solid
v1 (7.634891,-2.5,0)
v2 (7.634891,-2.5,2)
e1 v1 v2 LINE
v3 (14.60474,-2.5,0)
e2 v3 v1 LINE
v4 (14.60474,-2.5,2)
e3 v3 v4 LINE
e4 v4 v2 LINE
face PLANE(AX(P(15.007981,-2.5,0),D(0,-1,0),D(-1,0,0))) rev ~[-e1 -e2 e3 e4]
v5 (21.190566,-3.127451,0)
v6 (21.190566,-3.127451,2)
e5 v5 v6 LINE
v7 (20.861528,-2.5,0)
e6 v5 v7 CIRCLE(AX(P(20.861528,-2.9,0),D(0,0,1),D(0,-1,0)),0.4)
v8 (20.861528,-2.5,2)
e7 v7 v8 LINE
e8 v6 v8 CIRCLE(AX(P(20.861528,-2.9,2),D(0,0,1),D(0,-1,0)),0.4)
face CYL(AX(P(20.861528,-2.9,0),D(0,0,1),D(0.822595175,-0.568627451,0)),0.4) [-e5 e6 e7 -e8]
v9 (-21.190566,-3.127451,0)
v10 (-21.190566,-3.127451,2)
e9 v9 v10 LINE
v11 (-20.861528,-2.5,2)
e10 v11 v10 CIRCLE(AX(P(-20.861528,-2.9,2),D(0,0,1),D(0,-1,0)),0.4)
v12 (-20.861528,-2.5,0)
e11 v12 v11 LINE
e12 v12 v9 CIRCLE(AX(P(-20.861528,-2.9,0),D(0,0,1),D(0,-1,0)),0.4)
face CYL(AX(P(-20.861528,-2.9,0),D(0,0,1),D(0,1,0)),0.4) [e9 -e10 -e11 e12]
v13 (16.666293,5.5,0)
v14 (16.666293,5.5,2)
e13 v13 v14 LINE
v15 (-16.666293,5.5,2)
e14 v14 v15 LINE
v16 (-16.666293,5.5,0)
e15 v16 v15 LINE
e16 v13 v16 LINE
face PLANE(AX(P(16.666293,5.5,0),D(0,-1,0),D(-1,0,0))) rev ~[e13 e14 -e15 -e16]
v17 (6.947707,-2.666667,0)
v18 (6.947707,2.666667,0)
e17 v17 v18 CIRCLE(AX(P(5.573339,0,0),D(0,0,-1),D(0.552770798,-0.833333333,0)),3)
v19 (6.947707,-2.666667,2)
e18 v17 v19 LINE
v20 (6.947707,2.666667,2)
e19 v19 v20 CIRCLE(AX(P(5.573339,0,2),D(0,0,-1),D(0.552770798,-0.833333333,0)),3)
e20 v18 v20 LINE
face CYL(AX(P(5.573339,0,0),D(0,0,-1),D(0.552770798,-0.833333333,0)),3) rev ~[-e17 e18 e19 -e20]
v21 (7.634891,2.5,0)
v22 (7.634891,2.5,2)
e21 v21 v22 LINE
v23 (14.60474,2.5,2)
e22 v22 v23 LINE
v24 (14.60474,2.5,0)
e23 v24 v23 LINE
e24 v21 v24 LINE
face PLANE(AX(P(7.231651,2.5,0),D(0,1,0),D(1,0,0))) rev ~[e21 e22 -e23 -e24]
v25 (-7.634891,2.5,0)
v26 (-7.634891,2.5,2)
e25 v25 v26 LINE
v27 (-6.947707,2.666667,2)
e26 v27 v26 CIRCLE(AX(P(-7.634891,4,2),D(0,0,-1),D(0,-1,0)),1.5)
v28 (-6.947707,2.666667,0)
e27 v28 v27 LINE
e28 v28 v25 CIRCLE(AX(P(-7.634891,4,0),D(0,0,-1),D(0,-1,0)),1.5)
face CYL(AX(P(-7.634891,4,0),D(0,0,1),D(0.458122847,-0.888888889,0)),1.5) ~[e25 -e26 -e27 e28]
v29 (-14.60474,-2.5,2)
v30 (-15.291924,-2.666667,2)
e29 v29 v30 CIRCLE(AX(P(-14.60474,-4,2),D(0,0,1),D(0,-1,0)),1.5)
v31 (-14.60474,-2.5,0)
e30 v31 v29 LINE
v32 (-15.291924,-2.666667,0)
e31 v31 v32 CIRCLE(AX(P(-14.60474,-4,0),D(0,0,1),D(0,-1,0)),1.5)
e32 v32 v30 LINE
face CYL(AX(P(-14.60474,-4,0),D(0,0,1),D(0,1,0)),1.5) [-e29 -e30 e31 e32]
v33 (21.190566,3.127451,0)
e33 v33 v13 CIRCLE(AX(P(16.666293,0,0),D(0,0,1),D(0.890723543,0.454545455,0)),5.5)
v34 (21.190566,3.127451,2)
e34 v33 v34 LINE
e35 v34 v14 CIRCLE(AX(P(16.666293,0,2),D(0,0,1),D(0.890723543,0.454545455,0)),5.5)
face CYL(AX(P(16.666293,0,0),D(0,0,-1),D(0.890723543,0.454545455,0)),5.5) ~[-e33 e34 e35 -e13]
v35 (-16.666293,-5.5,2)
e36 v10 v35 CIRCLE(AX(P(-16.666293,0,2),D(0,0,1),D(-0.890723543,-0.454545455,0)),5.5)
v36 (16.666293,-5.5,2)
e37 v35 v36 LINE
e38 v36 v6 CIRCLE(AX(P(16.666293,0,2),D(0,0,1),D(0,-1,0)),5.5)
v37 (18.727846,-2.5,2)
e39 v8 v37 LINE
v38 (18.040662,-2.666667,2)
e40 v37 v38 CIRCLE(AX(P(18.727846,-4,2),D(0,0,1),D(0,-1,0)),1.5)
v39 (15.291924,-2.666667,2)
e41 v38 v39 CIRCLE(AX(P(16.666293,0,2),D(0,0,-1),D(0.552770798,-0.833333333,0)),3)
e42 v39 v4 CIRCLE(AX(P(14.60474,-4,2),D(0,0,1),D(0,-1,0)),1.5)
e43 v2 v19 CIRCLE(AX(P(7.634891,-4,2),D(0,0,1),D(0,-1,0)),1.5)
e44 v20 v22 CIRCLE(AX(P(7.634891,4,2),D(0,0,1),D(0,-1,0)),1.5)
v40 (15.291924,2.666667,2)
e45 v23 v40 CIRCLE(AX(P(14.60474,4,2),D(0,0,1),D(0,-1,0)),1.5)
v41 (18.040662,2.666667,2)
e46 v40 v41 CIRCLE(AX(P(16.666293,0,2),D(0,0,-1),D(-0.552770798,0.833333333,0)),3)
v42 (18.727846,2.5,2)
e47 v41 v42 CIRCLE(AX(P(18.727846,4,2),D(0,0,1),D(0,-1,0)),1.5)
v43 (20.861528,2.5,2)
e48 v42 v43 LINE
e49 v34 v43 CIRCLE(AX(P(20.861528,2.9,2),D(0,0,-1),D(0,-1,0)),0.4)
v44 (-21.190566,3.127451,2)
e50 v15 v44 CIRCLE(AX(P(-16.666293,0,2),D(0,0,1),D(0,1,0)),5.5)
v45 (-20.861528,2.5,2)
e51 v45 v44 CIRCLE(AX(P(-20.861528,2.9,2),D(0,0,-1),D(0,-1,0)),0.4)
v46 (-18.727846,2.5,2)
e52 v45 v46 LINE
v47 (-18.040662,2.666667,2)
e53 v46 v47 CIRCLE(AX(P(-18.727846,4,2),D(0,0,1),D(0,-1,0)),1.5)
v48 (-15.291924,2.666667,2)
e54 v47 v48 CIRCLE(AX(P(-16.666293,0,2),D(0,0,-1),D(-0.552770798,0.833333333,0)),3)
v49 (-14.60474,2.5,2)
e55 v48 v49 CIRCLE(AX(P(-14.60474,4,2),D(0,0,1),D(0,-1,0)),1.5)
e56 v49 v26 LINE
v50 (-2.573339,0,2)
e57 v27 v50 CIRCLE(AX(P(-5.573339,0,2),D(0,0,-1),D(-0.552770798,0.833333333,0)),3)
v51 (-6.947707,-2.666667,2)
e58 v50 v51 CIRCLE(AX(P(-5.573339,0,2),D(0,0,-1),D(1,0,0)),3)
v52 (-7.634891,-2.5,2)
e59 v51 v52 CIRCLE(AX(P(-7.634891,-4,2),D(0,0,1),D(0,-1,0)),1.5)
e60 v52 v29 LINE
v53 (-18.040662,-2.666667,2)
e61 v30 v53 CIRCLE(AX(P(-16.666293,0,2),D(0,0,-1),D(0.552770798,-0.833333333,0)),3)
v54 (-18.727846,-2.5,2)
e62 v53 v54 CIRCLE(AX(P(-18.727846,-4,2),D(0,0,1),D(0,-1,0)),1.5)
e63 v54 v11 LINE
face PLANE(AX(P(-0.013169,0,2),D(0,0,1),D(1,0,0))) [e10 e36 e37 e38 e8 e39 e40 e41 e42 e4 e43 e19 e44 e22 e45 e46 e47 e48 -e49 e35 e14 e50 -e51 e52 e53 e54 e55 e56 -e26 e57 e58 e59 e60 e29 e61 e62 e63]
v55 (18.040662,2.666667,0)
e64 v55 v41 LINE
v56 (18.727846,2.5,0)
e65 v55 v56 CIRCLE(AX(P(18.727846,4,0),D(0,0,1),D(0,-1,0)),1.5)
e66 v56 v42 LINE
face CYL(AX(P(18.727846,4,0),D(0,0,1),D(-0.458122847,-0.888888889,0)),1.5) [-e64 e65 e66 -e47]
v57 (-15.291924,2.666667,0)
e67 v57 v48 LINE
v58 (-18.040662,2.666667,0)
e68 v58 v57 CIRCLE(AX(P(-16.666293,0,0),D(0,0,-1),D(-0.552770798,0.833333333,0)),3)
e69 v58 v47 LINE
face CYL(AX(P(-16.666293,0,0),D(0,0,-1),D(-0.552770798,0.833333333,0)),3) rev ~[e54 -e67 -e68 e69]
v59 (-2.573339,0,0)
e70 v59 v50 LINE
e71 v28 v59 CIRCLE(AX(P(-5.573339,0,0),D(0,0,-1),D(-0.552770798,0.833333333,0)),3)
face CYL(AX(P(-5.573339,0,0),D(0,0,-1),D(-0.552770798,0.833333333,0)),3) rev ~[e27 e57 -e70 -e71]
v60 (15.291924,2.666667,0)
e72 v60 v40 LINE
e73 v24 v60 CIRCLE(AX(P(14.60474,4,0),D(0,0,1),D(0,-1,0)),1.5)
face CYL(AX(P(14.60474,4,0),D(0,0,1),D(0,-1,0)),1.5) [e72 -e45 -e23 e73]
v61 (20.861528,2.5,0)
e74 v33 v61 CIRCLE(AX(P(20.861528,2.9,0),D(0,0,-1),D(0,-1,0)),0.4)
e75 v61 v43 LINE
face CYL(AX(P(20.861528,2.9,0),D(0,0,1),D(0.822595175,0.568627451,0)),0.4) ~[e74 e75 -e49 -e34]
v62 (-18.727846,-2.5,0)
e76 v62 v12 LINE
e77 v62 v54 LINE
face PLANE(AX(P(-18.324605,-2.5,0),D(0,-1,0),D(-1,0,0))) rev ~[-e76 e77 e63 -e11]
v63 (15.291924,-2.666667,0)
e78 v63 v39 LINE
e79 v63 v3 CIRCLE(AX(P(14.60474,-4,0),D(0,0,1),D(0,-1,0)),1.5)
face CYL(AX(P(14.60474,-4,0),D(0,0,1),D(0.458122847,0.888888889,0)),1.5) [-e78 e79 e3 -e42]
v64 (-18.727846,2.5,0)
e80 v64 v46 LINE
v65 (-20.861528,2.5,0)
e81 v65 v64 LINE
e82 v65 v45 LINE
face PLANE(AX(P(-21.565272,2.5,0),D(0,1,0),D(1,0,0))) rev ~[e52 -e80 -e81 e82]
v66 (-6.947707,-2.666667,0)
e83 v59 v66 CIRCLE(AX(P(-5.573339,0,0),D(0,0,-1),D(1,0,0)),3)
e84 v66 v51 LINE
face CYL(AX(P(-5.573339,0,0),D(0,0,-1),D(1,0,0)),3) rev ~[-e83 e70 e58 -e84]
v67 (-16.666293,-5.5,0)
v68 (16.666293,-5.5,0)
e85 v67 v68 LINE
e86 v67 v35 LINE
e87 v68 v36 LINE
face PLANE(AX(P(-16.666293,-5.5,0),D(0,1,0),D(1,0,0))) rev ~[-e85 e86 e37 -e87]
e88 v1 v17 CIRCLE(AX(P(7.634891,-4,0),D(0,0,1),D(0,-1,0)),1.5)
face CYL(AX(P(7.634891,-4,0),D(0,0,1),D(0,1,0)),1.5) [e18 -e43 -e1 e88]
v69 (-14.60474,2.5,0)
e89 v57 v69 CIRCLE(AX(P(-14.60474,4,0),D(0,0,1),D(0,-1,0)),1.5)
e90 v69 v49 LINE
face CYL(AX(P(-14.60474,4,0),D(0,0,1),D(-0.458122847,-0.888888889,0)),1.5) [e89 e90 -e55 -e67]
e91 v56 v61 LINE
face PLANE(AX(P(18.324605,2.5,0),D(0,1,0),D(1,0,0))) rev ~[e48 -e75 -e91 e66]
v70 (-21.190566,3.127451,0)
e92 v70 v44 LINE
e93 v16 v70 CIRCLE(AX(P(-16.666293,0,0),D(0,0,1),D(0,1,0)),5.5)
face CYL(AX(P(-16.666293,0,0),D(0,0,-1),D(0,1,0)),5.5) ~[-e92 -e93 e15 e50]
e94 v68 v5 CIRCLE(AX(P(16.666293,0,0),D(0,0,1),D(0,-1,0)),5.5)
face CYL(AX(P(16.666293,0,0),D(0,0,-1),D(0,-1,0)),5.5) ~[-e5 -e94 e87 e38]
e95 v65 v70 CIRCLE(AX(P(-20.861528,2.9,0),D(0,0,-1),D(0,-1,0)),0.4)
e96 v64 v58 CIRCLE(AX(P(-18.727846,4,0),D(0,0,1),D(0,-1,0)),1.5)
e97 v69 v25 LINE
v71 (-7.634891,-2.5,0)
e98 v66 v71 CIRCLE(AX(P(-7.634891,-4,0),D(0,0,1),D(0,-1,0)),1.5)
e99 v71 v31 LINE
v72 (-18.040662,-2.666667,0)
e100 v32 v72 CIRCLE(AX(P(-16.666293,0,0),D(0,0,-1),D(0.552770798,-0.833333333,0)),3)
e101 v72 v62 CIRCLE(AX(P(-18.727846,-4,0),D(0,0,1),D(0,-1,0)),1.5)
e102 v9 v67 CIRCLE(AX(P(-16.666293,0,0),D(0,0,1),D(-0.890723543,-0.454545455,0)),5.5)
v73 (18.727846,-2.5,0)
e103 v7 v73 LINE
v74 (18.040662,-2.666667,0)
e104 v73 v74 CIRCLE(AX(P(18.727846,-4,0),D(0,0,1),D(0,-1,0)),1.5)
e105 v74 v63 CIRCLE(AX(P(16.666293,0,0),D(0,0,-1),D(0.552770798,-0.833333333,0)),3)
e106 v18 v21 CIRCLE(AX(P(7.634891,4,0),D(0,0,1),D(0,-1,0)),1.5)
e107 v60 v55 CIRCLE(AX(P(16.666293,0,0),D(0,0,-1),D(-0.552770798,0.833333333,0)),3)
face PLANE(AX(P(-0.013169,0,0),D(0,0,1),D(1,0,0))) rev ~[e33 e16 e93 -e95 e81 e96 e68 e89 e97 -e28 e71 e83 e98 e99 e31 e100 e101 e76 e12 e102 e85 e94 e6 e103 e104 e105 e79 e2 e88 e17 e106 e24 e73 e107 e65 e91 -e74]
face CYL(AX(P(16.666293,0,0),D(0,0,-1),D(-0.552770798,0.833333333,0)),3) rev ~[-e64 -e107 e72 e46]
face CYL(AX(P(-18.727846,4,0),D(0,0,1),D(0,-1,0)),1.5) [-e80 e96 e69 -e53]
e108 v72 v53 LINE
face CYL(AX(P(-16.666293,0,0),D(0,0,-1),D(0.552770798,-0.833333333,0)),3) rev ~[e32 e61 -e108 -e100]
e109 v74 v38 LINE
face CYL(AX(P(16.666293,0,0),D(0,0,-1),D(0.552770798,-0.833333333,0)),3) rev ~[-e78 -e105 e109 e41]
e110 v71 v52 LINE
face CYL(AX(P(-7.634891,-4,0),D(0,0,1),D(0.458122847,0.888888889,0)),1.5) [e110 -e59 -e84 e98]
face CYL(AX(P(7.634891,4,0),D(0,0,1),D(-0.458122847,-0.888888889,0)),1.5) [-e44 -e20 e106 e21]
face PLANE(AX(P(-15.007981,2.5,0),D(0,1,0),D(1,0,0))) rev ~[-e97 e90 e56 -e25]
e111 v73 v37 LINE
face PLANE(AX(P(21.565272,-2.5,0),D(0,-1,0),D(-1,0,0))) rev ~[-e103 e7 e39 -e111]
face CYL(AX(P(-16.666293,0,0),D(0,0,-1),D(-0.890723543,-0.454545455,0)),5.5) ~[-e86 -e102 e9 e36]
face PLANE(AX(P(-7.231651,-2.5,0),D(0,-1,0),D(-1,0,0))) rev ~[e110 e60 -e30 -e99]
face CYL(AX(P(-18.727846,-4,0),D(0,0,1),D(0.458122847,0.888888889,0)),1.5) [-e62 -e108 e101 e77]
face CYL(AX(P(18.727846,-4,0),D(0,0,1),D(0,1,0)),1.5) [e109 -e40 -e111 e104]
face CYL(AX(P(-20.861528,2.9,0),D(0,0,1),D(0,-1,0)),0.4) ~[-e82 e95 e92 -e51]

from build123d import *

# Parameters (mm, degrees)
F1_DEPTH = 2
F2_R     = 1.5
F3_R     = 0.4


with BuildPart() as f1:
    # F0 (on Top) → F1 (new body)
    with BuildSketch(Plane.XY):
        with BuildLine():
            ThreePointArc((-7.2316509448, 2.5), (-4.1547013841, 2.6433820369), (-2.5733385496, 0))
            ThreePointArc((-2.5733385496, 0), (-4.1547013841, -2.6433820369), (-7.2316509448, -2.5))
            Line((-7.2316509448, -2.5), (-11.7673134743, -2.5))
            ThreePointArc((-11.7673134743, -2.5), (-13.7940116366, -4.6904157598), (-16.6662929599, -5.5))
            Line((-16.6662929599, -5.5), (16.6662929599, -5.5))
            ThreePointArc((16.6662929599, -5.5), (13.7940116366, -4.6904157598), (11.7673134743, -2.5))
            Line((11.7673134743, -2.5), (7.2316509448, -2.5))
            ThreePointArc((7.2316509448, -2.5), (2.5733385496, 0), (7.2316509448, 2.5))
            Line((7.2316509448, 2.5), (11.7673134743, 2.5))
            ThreePointArc((11.7673134743, 2.5), (13.7940116366, 4.6904157598), (16.6662929599, 5.5))
            Line((16.6662929599, 5.5), (-16.6662929599, 5.5))
            ThreePointArc((-16.6662929599, 5.5), (-13.7940116366, 4.6904157598), (-11.7673134743, 2.5))
            Line((-11.7673134743, 2.5), (-7.2316509448, 2.5))
        make_face()
        with BuildLine():
            Line((-15.0079805647, 2.5), (-11.7673134743, 2.5))
            ThreePointArc((-11.7673134743, 2.5), (-13.7940116366, 4.6904157598), (-16.6662929599, 5.5))
            ThreePointArc((-16.6662929599, 5.5), (-19.5385742831, 4.6904157598), (-21.5652724454, 2.5))
            Line((-21.5652724454, 2.5), (-18.324605355, 2.5))
            ThreePointArc((-18.324605355, 2.5), (-16.6662929599, 3), (-15.0079805647, 2.5))
        make_face()
        with BuildLine():
            ThreePointArc((-16.6662929599, -5.5), (-13.7940116366, -4.6904157598), (-11.7673134743, -2.5))
            Line((-11.7673134743, -2.5), (-15.0079805647, -2.5))
            ThreePointArc((-15.0079805647, -2.5), (-16.6662929599, -3), (-18.324605355, -2.5))
            Line((-18.324605355, -2.5), (-21.5652724454, -2.5))
            ThreePointArc((-21.5652724454, -2.5), (-19.5385742831, -4.6904157598), (-16.6662929599, -5.5))
        make_face()
        with BuildLine():
            ThreePointArc((21.5652724454, 2.5), (19.5385742831, 4.6904157598), (16.6662929599, 5.5))
            ThreePointArc((16.6662929599, 5.5), (13.7940116366, 4.6904157598), (11.7673134743, 2.5))
            Line((11.7673134743, 2.5), (15.0079805647, 2.5))
            ThreePointArc((15.0079805647, 2.5), (16.6662929599, 3), (18.324605355, 2.5))
            Line((18.324605355, 2.5), (21.5652724454, 2.5))
        make_face()
        with BuildLine():
            ThreePointArc((11.7673134743, -2.5), (13.7940116366, -4.6904157598), (16.6662929599, -5.5))
            ThreePointArc((16.6662929599, -5.5), (19.5385742831, -4.6904157598), (21.5652724454, -2.5))
            Line((21.5652724454, -2.5), (18.324605355, -2.5))
            ThreePointArc((18.324605355, -2.5), (16.6662929599, -3), (15.0079805647, -2.5))
            Line((15.0079805647, -2.5), (11.7673134743, -2.5))
        make_face()
    extrude(amount=F1_DEPTH)

    # F2
    f2_edges = [f1.edges().sort_by_distance(p)[0] for p in [
        (-15.007981, 2.5, 1),
        (-18.324605, 2.5, 1),
        (-7.231651, 2.5, 1),
        (-18.324605, -2.5, 1),
        (-15.007981, -2.5, 1),
        (-7.231651, -2.5, 1),
        (7.231651, 2.5, 1),
        (18.324605, 2.5, 1),
        (15.007981, 2.5, 1),
        (7.231651, -2.5, 1),
        (15.007981, -2.5, 1),
        (18.324605, -2.5, 1),
    ]]
    fillet(f2_edges, radius=F2_R)

    # F3
    f3_edges = [f1.edges().sort_by_distance(p)[0] for p in [
        (21.565272, 2.5, 1),
        (21.565272, -2.5, 1),
        (-21.565272, 2.5, 1),
        (-21.565272, -2.5, 1),
    ]]
    fillet(f3_edges, radius=F3_R)


solid = f1.part
